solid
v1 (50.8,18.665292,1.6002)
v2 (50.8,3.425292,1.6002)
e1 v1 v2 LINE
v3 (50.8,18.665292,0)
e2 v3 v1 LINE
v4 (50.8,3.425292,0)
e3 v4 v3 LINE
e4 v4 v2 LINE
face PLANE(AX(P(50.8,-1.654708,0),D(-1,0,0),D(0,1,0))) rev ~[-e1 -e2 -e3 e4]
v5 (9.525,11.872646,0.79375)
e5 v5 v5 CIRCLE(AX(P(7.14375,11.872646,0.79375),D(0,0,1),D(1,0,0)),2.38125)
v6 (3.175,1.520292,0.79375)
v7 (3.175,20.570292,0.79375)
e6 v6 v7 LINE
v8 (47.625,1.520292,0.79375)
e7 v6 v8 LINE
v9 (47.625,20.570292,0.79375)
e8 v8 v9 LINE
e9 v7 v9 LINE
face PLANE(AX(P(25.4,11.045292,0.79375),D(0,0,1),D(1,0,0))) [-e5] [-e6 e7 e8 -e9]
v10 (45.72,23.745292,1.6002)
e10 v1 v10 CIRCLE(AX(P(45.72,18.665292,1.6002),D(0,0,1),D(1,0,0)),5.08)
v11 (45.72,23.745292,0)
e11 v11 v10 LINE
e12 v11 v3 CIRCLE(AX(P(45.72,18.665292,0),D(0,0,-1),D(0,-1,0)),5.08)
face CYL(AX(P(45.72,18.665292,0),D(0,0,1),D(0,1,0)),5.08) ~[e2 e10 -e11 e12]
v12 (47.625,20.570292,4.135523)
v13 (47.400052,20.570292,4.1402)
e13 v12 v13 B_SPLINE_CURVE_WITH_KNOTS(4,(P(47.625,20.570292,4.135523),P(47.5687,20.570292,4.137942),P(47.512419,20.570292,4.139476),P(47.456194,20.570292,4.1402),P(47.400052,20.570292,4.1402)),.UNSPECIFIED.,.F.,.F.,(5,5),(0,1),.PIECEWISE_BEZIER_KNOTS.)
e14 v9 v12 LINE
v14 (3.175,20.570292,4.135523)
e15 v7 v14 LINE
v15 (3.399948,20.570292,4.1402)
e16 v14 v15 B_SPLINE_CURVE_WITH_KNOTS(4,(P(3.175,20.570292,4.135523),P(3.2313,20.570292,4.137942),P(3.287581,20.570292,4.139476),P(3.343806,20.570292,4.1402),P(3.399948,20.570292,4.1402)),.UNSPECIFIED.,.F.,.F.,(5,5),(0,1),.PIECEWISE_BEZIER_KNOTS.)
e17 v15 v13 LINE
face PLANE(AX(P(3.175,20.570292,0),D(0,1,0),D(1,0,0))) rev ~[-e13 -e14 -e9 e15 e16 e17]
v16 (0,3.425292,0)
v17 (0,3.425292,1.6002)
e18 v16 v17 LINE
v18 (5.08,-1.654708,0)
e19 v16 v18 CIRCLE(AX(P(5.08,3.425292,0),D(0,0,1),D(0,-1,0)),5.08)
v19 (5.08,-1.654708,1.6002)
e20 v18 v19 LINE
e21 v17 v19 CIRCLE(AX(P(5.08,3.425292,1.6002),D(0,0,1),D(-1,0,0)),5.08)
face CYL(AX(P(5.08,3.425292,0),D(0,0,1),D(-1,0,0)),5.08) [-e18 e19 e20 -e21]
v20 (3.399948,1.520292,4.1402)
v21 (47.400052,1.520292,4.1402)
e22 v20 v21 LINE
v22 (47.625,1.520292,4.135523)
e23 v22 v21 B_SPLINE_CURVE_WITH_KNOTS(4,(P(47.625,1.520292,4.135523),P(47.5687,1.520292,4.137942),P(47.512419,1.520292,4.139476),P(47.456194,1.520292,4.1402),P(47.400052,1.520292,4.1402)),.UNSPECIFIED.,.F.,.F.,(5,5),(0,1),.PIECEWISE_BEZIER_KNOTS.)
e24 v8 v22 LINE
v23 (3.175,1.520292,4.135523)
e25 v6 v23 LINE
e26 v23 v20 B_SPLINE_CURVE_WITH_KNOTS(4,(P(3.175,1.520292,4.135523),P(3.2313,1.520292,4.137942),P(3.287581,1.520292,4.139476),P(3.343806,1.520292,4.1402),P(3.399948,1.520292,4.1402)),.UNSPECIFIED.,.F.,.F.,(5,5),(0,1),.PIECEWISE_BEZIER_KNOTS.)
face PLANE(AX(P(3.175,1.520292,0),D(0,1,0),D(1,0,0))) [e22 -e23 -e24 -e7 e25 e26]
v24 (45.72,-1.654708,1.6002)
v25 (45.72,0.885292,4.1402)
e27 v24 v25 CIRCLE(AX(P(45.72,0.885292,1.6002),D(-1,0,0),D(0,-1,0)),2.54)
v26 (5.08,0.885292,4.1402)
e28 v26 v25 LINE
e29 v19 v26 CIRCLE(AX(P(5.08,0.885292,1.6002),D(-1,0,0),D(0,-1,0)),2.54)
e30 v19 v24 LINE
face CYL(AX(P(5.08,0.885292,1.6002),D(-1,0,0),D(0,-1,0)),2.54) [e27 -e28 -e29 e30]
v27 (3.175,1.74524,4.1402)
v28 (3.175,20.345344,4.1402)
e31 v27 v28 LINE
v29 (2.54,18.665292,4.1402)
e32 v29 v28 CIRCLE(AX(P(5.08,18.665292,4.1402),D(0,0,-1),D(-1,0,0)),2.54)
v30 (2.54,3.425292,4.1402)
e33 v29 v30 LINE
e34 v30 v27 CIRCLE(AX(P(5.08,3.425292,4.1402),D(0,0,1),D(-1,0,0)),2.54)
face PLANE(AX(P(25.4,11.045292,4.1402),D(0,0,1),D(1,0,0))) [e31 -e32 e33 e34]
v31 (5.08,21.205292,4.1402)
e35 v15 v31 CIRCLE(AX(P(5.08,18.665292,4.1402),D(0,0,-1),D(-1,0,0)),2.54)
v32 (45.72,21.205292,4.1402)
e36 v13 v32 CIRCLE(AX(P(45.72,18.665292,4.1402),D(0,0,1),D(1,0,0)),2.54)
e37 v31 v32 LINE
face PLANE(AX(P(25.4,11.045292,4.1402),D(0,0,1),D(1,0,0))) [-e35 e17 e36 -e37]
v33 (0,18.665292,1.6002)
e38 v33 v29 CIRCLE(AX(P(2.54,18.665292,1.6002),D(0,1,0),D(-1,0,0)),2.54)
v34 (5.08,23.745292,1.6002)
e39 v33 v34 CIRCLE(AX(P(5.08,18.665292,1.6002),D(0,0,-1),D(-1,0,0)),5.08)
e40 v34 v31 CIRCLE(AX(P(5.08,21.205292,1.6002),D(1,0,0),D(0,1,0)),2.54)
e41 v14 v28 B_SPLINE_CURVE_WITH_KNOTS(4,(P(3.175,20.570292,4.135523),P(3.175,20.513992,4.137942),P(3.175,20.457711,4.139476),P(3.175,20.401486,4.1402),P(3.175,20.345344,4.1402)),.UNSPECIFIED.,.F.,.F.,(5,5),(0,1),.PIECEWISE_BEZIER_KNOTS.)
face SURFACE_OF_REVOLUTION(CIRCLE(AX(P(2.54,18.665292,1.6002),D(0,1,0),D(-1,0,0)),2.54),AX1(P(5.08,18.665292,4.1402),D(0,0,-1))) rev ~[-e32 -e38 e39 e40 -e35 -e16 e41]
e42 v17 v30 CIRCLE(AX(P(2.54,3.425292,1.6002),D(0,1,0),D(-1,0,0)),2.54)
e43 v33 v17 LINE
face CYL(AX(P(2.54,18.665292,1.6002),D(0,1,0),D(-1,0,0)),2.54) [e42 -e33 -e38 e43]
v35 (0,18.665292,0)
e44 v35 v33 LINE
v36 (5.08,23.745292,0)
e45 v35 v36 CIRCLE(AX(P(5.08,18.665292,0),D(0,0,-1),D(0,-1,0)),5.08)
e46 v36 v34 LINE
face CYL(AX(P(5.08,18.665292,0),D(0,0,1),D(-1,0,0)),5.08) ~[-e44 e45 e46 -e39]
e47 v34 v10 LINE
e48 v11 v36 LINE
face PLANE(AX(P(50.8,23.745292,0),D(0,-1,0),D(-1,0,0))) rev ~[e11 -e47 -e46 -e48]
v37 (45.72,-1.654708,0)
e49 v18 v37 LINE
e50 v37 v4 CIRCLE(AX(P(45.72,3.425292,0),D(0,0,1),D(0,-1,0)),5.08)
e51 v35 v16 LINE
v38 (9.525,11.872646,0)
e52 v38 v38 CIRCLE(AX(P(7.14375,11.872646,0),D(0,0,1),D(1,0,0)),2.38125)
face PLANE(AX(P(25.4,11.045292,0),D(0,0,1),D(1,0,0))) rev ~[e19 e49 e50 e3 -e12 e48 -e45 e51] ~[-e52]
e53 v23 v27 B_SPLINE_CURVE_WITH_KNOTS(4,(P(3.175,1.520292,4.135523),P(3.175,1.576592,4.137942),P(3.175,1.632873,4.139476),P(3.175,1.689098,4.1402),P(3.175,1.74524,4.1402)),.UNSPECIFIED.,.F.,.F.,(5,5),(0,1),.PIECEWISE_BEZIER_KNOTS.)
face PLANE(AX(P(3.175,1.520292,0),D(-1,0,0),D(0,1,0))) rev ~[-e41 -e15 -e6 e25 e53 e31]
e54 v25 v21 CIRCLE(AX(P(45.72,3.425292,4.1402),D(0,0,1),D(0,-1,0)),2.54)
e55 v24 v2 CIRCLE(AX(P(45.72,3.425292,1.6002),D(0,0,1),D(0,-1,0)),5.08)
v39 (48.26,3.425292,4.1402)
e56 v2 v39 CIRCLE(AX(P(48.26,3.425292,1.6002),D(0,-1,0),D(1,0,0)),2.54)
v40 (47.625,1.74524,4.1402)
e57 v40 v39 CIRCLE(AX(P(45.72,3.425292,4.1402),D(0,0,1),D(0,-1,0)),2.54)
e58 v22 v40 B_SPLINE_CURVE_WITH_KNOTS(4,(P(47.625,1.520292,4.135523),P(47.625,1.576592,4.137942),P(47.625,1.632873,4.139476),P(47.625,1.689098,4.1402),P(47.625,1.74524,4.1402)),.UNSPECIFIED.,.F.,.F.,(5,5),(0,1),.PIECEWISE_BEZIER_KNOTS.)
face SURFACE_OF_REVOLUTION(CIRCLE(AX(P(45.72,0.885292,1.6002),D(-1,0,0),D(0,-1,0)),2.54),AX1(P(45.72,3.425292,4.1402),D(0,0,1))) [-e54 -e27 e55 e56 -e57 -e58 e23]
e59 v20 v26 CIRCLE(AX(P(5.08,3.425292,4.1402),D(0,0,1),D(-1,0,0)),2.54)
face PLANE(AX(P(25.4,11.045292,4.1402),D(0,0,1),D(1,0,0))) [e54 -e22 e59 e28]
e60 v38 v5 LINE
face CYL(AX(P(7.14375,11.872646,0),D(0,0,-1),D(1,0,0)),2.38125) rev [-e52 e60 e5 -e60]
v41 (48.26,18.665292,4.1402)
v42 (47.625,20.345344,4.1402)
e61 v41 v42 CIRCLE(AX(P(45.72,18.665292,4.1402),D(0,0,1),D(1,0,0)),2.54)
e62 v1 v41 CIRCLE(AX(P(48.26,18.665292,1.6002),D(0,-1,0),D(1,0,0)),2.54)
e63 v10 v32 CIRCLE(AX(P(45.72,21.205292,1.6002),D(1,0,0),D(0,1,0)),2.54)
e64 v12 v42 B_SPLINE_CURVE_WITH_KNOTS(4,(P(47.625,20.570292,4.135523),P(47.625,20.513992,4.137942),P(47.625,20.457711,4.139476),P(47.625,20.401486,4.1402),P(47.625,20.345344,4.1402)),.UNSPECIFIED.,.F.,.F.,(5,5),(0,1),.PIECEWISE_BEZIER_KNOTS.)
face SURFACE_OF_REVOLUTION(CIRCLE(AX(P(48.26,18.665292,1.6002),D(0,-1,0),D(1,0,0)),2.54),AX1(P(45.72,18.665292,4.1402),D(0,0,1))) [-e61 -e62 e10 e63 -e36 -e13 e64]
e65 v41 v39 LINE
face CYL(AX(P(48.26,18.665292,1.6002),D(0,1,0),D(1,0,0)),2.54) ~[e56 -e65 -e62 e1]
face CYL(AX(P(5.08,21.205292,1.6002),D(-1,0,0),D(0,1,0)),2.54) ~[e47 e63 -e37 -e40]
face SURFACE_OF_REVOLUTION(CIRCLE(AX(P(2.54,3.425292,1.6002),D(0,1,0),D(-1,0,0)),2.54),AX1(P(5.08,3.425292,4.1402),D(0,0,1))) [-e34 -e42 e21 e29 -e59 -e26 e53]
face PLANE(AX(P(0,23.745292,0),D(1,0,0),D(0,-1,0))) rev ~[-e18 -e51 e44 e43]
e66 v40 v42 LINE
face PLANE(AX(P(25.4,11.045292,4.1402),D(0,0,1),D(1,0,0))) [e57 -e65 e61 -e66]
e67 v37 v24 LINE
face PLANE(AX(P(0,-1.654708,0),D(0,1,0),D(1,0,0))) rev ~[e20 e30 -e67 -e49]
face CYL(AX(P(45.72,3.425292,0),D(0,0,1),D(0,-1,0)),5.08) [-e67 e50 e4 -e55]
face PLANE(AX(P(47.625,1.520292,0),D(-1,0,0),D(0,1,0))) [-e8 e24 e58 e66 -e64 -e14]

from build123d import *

# Parameters (mm, degrees)
F0_W         = 44.45
F0_H         = 19.05
F0_R         = 2.38125
F1_DEPTH     = 0.79375
F2_DEPTH     = 4.1402
F3_R         = 5.08
F4_T1_DEPTH  = 40.64
F4_T3_DEPTH  = 15.24
F4_T6_ANGLE  = 90
F4_T8_ANGLE  = 90
F4_T10_ANGLE = 90
F4_T12_ANGLE = 90


# Not quite as in the source:
# - a fillet or chamfer that OpenCascade refuses, or shapes differently, is made with other operations: its cross-section is extruded or revolved along the edge and cut away or added


with BuildPart() as f1:
    # F0 (on Top) → F1 (new body)
    with BuildSketch(Plane.XY):
        with Locations((25.4, 11.0452919405)):
            Rectangle(F0_W, F0_H)
        with Locations((7.14375, 11.8726459702)):
            Circle(F0_R, mode=Mode.SUBTRACT)
    extrude(amount=F1_DEPTH)

    # F0 (on Top) → F2 (join)
    with BuildSketch(Plane.XY):
        Polygon((0, 23.7452919405), (0, 0), (0, -1.6547080595), (50.8, -1.6547080595), (50.8, 23.7452919405), align=None)
        with Locations((25.4, 11.0452919405)):
            Rectangle(F0_W, F0_H, mode=Mode.SUBTRACT)
    extrude(amount=F2_DEPTH)

    # F3
    f3_edges = [f1.edges().sort_by_distance(p)[0] for p in [
        (50.8, -1.654708, 2.0701),
        (0, -1.654708, 2.0701),
        (50.8, 23.745292, 2.0701),
        (0, 23.745292, 2.0701),
    ]]
    fillet(f3_edges, radius=F3_R)

    # F4: fillet of radius 2.54 on 8 edges, made by hand

    # F4_s2 → F4_t1 (cut)
    with BuildSketch(Plane.YZ.offset(5.08)):
        with BuildLine():
            ThreePointArc((-1.6547080595, 1.6002), (-0.9107592837, 3.3962512242), (0.8852919405, 4.1402))
            Line((0.8852919405, 4.1402), (-1.6547080595, 4.1402))
            Line((-1.6547080595, 4.1402), (-1.6547080595, 1.6002))
        make_face()
        with BuildLine():
            ThreePointArc((23.7452919405, 1.6002), (23.0013431647, 3.3962512242), (21.2052919405, 4.1402))
            Line((21.2052919405, 4.1402), (23.7452919405, 4.1402))
            Line((23.7452919405, 4.1402), (23.7452919405, 1.6002))
        make_face()
    extrude(amount=F4_T1_DEPTH, mode=Mode.SUBTRACT)

    # F4_s4 → F4_t3 (cut)
    with BuildSketch(Plane.XZ.offset(-18.6652919405)):
        with BuildLine():
            ThreePointArc((0, 1.6002), (0.7439487758, 3.3962512242), (2.54, 4.1402))
            Line((2.54, 4.1402), (0, 4.1402))
            Line((0, 4.1402), (0, 1.6002))
        make_face()
        with BuildLine():
            ThreePointArc((50.8, 1.6002), (50.0560512242, 3.3962512242), (48.26, 4.1402))
            Line((48.26, 4.1402), (50.8, 4.1402))
            Line((50.8, 4.1402), (50.8, 1.6002))
        make_face()
    extrude(amount=F4_T3_DEPTH, mode=Mode.SUBTRACT)

    # F4_s5 → F4_t6 (revolve, cut)
    with BuildSketch(Plane.XZ.offset(-18.6652919405)):
        with BuildLine():
            ThreePointArc((0, 1.6002), (0.7439487758, 3.3962512242), (2.54, 4.1402))
            Line((2.54, 4.1402), (0, 4.1402))
            Line((0, 4.1402), (0, 1.6002))
        make_face()
    revolve(axis=Axis((5.08, 18.6652919405, 4.1402), (0, 0, -1)), revolution_arc=F4_T6_ANGLE, mode=Mode.SUBTRACT)

    # F4_s7 → F4_t8 (revolve, cut)
    with BuildSketch(Plane.XZ.offset(-3.4252919405)):
        with BuildLine():
            ThreePointArc((0, 1.6002), (0.7439487758, 3.3962512242), (2.54, 4.1402))
            Line((2.54, 4.1402), (0, 4.1402))
            Line((0, 4.1402), (0, 1.6002))
        make_face()
    revolve(axis=Axis((5.08, 3.4252919405, 4.1402), (0, 0, 1)), revolution_arc=F4_T8_ANGLE, mode=Mode.SUBTRACT)

    # F4_s9 → F4_t10 (revolve, cut)
    with BuildSketch(Plane.XZ.offset(-18.6652919405)):
        with BuildLine():
            ThreePointArc((50.8, 1.6002), (50.0560512242, 3.3962512242), (48.26, 4.1402))
            Line((48.26, 4.1402), (50.8, 4.1402))
            Line((50.8, 4.1402), (50.8, 1.6002))
        make_face()
    revolve(axis=Axis((45.72, 18.6652919405, 4.1402), (0, 0, 1)), revolution_arc=F4_T10_ANGLE, mode=Mode.SUBTRACT)

    # F4_s11 → F4_t12 (revolve, cut)
    with BuildSketch(Plane.YZ.offset(45.72)):
        with BuildLine():
            ThreePointArc((-1.6547080595, 1.6002), (-0.9107592837, 3.3962512242), (0.8852919405, 4.1402))
            Line((0.8852919405, 4.1402), (-1.6547080595, 4.1402))
            Line((-1.6547080595, 4.1402), (-1.6547080595, 1.6002))
        make_face()
    revolve(axis=Axis((45.72, 3.4252919405, 4.1402), (0, 0, 1)), revolution_arc=F4_T12_ANGLE, mode=Mode.SUBTRACT)


solid = f1.part
